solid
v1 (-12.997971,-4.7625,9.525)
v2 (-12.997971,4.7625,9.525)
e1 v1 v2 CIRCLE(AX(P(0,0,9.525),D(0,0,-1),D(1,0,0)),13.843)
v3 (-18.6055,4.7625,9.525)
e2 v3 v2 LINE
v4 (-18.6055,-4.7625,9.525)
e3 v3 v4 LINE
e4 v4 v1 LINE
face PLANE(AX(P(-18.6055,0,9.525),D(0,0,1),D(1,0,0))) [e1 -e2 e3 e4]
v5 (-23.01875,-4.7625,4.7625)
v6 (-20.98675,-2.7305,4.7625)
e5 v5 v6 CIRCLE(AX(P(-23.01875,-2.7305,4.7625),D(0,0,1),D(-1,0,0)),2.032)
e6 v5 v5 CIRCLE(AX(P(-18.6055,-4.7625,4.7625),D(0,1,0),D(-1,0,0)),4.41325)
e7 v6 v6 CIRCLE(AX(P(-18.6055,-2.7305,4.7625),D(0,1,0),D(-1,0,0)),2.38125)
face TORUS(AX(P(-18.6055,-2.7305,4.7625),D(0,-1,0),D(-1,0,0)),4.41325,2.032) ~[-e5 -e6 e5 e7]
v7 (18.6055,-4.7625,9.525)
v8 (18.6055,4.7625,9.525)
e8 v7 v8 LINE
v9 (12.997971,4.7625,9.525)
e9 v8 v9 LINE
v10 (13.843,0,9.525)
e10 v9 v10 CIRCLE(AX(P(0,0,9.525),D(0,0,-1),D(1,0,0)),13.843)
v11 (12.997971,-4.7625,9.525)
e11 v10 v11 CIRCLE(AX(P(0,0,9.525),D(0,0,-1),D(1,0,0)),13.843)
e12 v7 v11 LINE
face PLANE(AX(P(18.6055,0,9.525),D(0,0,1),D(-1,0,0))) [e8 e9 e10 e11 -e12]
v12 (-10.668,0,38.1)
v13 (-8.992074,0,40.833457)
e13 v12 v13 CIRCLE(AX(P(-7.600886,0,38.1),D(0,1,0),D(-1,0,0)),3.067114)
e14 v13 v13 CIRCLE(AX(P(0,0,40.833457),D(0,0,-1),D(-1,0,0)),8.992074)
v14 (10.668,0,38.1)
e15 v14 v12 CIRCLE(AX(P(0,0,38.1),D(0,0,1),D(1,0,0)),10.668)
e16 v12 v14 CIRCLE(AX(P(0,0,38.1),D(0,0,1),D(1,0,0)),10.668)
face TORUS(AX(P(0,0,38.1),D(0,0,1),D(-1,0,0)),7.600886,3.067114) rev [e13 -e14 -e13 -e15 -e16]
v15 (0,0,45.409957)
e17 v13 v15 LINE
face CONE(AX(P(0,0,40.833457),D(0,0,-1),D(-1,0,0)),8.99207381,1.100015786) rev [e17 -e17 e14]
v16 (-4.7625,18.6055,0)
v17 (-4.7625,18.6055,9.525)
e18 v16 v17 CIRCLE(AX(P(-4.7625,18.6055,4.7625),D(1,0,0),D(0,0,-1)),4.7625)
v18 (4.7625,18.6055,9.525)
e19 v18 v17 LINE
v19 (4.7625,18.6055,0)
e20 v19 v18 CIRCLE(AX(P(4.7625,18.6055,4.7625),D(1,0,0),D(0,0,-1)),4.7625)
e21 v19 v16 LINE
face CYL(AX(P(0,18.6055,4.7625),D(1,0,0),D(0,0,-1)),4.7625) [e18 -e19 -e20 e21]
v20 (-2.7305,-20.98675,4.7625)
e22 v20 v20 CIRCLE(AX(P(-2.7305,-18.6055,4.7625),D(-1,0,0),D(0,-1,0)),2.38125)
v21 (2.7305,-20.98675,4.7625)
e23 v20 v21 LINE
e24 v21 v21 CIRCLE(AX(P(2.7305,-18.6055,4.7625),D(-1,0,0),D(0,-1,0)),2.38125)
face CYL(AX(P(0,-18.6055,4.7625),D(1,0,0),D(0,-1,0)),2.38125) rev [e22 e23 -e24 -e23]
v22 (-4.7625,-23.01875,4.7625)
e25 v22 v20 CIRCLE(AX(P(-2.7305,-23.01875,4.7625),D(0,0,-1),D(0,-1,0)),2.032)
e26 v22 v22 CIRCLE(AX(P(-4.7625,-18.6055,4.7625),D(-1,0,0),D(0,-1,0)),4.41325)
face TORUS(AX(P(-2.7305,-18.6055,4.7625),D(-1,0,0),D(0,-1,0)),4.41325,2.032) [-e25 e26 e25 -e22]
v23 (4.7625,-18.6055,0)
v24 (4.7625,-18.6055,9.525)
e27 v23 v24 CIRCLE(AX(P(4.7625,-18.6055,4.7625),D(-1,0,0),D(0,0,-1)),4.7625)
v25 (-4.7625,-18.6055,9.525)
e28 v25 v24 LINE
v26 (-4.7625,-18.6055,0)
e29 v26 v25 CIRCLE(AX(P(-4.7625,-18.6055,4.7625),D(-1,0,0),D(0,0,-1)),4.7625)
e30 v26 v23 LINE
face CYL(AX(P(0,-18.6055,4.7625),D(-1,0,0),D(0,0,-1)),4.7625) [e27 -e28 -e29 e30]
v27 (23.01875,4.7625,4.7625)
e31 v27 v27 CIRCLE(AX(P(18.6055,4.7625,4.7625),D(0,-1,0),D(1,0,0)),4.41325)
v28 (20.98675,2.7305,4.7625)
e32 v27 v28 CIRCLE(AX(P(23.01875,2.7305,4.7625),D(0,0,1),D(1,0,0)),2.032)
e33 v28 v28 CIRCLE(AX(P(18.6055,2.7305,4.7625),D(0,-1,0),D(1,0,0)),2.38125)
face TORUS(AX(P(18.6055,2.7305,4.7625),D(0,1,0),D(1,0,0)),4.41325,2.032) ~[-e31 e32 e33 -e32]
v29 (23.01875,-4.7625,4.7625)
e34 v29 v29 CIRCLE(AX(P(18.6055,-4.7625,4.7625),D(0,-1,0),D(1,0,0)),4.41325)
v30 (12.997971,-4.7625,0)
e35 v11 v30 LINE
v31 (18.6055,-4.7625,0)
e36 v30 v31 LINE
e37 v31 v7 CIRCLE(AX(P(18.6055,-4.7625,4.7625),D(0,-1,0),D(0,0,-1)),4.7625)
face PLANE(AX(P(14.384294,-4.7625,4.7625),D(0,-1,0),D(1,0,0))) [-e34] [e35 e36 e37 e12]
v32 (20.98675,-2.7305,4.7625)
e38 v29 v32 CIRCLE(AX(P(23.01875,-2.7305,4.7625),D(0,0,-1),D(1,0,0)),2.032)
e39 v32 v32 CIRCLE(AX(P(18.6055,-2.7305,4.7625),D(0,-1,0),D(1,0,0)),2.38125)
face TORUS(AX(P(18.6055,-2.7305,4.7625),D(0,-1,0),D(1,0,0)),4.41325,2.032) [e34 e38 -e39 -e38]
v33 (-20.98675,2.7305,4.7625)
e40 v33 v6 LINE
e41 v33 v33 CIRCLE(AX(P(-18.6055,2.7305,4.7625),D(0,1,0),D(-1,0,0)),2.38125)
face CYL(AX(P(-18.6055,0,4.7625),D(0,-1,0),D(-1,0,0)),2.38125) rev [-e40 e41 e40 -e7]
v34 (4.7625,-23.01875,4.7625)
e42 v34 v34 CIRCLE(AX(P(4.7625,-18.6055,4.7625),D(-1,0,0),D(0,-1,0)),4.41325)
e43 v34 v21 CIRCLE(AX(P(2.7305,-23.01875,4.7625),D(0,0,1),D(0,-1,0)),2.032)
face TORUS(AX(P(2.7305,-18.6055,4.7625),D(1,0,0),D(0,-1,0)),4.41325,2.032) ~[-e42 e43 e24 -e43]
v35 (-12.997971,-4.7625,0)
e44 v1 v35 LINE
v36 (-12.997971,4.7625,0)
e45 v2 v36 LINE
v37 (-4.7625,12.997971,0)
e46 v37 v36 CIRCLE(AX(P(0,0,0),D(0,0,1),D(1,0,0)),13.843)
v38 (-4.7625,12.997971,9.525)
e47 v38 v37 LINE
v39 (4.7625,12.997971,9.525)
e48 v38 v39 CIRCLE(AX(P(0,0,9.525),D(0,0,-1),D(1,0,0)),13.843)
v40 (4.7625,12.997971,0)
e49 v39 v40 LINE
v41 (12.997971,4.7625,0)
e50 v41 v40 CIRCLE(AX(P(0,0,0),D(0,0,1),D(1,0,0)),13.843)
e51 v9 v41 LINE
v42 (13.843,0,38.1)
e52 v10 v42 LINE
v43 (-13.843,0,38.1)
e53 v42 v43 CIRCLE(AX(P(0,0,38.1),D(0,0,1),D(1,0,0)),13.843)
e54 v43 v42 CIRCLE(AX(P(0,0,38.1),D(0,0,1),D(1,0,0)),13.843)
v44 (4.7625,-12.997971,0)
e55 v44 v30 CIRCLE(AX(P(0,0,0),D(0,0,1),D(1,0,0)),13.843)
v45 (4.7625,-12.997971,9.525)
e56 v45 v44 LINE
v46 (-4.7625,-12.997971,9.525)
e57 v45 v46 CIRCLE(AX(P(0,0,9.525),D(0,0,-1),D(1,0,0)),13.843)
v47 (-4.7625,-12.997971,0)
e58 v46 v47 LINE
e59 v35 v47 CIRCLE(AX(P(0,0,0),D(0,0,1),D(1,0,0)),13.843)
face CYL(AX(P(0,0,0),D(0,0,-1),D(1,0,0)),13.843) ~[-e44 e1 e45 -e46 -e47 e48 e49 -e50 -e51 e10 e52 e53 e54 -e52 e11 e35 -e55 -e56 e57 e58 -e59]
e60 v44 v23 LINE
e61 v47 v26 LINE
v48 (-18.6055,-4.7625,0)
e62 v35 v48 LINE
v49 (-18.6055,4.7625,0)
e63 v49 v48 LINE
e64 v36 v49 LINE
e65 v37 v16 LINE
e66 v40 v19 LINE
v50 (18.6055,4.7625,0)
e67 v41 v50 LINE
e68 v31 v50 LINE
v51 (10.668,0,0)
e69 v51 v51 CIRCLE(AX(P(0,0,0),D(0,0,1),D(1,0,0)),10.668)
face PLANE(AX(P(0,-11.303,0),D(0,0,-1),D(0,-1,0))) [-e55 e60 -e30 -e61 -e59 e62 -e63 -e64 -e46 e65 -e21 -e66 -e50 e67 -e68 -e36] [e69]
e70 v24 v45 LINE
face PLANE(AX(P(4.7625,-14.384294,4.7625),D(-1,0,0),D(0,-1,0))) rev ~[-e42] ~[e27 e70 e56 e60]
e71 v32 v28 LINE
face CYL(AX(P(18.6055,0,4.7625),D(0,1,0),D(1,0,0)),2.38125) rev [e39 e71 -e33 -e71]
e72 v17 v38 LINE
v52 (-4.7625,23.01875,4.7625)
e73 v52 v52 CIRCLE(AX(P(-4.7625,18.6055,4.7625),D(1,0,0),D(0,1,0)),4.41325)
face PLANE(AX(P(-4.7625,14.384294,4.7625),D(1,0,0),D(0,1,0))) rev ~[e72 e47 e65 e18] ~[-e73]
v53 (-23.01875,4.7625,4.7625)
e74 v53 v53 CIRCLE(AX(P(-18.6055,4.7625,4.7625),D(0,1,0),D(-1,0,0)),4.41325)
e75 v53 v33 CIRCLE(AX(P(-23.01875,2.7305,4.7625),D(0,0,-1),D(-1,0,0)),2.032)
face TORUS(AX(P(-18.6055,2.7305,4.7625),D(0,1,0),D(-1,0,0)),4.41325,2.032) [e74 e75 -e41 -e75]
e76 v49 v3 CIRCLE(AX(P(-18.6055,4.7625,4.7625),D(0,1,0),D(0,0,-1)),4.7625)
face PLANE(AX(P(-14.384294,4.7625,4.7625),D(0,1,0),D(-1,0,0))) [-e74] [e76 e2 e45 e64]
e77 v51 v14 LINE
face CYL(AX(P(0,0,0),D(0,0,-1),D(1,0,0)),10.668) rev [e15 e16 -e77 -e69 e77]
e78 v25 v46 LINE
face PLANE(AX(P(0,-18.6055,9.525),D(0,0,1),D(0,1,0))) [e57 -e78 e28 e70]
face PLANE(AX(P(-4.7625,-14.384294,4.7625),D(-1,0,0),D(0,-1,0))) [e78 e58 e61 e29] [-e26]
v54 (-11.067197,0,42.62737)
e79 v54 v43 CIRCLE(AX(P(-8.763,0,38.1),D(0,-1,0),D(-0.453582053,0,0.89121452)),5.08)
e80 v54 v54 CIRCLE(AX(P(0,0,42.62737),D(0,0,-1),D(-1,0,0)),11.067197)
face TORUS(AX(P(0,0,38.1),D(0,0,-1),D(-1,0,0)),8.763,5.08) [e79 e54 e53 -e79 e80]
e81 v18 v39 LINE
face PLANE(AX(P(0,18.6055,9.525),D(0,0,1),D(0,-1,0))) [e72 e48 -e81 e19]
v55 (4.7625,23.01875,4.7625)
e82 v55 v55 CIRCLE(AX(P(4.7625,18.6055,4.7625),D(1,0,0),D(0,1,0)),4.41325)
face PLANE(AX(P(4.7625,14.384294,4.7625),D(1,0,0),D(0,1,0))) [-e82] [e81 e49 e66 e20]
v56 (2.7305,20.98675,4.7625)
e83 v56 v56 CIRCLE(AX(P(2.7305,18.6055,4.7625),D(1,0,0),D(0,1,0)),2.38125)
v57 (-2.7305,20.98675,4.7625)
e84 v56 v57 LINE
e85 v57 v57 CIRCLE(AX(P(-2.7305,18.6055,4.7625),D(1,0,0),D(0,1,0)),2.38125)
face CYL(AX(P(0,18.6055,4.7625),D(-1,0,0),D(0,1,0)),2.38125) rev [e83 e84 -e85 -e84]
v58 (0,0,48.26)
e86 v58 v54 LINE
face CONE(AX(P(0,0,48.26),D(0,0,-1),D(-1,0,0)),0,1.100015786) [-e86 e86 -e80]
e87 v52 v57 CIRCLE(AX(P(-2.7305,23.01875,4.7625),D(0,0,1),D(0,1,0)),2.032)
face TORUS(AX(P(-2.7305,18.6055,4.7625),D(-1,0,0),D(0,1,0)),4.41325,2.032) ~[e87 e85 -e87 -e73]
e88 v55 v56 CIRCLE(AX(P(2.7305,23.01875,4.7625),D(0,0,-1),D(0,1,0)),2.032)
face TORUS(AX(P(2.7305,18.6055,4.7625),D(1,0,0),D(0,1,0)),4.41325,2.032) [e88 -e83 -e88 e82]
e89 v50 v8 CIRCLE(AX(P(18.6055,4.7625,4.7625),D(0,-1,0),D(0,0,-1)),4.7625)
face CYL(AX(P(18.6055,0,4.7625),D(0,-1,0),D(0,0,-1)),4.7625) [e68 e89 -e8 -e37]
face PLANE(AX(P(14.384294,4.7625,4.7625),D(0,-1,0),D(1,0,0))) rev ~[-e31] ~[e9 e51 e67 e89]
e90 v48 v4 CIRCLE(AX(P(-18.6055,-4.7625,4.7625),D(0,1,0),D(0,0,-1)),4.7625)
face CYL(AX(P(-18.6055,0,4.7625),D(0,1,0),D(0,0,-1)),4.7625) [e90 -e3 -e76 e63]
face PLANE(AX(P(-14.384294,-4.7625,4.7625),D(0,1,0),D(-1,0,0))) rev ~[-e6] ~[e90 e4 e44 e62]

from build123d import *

# Parameters (mm, degrees)
F0_R            = 13.843
F0_R_2          = 10.668
F1_DEPTH        = 38.1
F2_R            = 2.38125
F3_DEPTH        = 4.7625
F3_COPIES_COUNT = 4
F4_R            = 2.032


# Not quite as in the source:
# - a pattern or mirror of a feature is missing from the dataset's text; its kind, count and spacing are read off the source's solid


with BuildPart() as f1:
    # F0 (on Top) → F1 (new body)
    with BuildSketch(Plane.XY):
        Circle(F0_R)
        Circle(F0_R_2, mode=Mode.SUBTRACT)
    extrude(amount=F1_DEPTH)

    # F2 (on Front) → F3 (join, symmetric)
    with BuildSketch(Plane.XZ):
        with BuildLine():
            ThreePointArc((18.6055, 0), (13.843, 4.7625), (18.6055, 9.525))
            Line((18.6055, 9.525), (13.843, 9.525))
            Line((13.843, 9.525), (11.303, 9.525))
            Line((11.303, 9.525), (11.303, 0))
            Line((11.303, 0), (13.843, 0))
            Line((13.843, 0), (18.6055, 0))
        make_face()
        with BuildLine():
            ThreePointArc((18.6055, 0), (21.9730960454, 1.3949039546), (23.368, 4.7625))
            ThreePointArc((23.368, 4.7625), (21.9730960454, 8.1300960454), (18.6055, 9.525))
            ThreePointArc((18.6055, 9.525), (13.843, 4.7625), (18.6055, 0))
        make_face()
        with Locations((18.6055, 4.7625)):
            Circle(F2_R, mode=Mode.SUBTRACT)
    f3 = extrude(amount=F3_DEPTH, both=True)

    # F3_copies: F3 ×4 about axis
    f3_copies_axis = Axis((0, 0, 0), (0, 0, 1))
    for i in range(1, F3_COPIES_COUNT):
        add(f3.rotate(f3_copies_axis, i * 360 / F3_COPIES_COUNT))

    # F4
    f4_edges = [f1.edges().sort_by_distance(p)[0] for p in [
        (16.22425, -4.7625, 4.7625),
        (16.22425, 4.7625, 4.7625),
        (-16.22425, -4.7625, 4.7625),
        (-16.22425, 4.7625, 4.7625),
        (-4.7625, 16.22425, 4.7625),
        (4.7625, 16.22425, 4.7625),
        (-4.7625, -16.22425, 4.7625),
        (4.7625, -16.22425, 4.7625),
    ]]
    fillet(f4_edges, radius=F4_R)

    # F5 (on Front) → F6 (revolve)
    with BuildSketch(Plane.XZ):
        with BuildLine():
            Line((0, 48.26), (-11.0671968277, 42.6273697639))
            ThreePointArc((-11.0671968277, 42.6273697639), (-13.0938036139, 40.7552853063), (-13.843, 38.1))
            Line((-13.843, 38.1), (-10.668, 38.1))
            ThreePointArc((-10.668, 38.1), (-10.2156632287, 39.7031620073), (-8.9920738104, 40.8334566201))
            Line((-8.9920738104, 40.8334566201), (0, 45.4099566696))
            Line((0, 45.4099566696), (0, 48.26))
        make_face()
    revolve(axis=Axis((0, 0, 0), (0, 0, -1)))


solid = f1.part
